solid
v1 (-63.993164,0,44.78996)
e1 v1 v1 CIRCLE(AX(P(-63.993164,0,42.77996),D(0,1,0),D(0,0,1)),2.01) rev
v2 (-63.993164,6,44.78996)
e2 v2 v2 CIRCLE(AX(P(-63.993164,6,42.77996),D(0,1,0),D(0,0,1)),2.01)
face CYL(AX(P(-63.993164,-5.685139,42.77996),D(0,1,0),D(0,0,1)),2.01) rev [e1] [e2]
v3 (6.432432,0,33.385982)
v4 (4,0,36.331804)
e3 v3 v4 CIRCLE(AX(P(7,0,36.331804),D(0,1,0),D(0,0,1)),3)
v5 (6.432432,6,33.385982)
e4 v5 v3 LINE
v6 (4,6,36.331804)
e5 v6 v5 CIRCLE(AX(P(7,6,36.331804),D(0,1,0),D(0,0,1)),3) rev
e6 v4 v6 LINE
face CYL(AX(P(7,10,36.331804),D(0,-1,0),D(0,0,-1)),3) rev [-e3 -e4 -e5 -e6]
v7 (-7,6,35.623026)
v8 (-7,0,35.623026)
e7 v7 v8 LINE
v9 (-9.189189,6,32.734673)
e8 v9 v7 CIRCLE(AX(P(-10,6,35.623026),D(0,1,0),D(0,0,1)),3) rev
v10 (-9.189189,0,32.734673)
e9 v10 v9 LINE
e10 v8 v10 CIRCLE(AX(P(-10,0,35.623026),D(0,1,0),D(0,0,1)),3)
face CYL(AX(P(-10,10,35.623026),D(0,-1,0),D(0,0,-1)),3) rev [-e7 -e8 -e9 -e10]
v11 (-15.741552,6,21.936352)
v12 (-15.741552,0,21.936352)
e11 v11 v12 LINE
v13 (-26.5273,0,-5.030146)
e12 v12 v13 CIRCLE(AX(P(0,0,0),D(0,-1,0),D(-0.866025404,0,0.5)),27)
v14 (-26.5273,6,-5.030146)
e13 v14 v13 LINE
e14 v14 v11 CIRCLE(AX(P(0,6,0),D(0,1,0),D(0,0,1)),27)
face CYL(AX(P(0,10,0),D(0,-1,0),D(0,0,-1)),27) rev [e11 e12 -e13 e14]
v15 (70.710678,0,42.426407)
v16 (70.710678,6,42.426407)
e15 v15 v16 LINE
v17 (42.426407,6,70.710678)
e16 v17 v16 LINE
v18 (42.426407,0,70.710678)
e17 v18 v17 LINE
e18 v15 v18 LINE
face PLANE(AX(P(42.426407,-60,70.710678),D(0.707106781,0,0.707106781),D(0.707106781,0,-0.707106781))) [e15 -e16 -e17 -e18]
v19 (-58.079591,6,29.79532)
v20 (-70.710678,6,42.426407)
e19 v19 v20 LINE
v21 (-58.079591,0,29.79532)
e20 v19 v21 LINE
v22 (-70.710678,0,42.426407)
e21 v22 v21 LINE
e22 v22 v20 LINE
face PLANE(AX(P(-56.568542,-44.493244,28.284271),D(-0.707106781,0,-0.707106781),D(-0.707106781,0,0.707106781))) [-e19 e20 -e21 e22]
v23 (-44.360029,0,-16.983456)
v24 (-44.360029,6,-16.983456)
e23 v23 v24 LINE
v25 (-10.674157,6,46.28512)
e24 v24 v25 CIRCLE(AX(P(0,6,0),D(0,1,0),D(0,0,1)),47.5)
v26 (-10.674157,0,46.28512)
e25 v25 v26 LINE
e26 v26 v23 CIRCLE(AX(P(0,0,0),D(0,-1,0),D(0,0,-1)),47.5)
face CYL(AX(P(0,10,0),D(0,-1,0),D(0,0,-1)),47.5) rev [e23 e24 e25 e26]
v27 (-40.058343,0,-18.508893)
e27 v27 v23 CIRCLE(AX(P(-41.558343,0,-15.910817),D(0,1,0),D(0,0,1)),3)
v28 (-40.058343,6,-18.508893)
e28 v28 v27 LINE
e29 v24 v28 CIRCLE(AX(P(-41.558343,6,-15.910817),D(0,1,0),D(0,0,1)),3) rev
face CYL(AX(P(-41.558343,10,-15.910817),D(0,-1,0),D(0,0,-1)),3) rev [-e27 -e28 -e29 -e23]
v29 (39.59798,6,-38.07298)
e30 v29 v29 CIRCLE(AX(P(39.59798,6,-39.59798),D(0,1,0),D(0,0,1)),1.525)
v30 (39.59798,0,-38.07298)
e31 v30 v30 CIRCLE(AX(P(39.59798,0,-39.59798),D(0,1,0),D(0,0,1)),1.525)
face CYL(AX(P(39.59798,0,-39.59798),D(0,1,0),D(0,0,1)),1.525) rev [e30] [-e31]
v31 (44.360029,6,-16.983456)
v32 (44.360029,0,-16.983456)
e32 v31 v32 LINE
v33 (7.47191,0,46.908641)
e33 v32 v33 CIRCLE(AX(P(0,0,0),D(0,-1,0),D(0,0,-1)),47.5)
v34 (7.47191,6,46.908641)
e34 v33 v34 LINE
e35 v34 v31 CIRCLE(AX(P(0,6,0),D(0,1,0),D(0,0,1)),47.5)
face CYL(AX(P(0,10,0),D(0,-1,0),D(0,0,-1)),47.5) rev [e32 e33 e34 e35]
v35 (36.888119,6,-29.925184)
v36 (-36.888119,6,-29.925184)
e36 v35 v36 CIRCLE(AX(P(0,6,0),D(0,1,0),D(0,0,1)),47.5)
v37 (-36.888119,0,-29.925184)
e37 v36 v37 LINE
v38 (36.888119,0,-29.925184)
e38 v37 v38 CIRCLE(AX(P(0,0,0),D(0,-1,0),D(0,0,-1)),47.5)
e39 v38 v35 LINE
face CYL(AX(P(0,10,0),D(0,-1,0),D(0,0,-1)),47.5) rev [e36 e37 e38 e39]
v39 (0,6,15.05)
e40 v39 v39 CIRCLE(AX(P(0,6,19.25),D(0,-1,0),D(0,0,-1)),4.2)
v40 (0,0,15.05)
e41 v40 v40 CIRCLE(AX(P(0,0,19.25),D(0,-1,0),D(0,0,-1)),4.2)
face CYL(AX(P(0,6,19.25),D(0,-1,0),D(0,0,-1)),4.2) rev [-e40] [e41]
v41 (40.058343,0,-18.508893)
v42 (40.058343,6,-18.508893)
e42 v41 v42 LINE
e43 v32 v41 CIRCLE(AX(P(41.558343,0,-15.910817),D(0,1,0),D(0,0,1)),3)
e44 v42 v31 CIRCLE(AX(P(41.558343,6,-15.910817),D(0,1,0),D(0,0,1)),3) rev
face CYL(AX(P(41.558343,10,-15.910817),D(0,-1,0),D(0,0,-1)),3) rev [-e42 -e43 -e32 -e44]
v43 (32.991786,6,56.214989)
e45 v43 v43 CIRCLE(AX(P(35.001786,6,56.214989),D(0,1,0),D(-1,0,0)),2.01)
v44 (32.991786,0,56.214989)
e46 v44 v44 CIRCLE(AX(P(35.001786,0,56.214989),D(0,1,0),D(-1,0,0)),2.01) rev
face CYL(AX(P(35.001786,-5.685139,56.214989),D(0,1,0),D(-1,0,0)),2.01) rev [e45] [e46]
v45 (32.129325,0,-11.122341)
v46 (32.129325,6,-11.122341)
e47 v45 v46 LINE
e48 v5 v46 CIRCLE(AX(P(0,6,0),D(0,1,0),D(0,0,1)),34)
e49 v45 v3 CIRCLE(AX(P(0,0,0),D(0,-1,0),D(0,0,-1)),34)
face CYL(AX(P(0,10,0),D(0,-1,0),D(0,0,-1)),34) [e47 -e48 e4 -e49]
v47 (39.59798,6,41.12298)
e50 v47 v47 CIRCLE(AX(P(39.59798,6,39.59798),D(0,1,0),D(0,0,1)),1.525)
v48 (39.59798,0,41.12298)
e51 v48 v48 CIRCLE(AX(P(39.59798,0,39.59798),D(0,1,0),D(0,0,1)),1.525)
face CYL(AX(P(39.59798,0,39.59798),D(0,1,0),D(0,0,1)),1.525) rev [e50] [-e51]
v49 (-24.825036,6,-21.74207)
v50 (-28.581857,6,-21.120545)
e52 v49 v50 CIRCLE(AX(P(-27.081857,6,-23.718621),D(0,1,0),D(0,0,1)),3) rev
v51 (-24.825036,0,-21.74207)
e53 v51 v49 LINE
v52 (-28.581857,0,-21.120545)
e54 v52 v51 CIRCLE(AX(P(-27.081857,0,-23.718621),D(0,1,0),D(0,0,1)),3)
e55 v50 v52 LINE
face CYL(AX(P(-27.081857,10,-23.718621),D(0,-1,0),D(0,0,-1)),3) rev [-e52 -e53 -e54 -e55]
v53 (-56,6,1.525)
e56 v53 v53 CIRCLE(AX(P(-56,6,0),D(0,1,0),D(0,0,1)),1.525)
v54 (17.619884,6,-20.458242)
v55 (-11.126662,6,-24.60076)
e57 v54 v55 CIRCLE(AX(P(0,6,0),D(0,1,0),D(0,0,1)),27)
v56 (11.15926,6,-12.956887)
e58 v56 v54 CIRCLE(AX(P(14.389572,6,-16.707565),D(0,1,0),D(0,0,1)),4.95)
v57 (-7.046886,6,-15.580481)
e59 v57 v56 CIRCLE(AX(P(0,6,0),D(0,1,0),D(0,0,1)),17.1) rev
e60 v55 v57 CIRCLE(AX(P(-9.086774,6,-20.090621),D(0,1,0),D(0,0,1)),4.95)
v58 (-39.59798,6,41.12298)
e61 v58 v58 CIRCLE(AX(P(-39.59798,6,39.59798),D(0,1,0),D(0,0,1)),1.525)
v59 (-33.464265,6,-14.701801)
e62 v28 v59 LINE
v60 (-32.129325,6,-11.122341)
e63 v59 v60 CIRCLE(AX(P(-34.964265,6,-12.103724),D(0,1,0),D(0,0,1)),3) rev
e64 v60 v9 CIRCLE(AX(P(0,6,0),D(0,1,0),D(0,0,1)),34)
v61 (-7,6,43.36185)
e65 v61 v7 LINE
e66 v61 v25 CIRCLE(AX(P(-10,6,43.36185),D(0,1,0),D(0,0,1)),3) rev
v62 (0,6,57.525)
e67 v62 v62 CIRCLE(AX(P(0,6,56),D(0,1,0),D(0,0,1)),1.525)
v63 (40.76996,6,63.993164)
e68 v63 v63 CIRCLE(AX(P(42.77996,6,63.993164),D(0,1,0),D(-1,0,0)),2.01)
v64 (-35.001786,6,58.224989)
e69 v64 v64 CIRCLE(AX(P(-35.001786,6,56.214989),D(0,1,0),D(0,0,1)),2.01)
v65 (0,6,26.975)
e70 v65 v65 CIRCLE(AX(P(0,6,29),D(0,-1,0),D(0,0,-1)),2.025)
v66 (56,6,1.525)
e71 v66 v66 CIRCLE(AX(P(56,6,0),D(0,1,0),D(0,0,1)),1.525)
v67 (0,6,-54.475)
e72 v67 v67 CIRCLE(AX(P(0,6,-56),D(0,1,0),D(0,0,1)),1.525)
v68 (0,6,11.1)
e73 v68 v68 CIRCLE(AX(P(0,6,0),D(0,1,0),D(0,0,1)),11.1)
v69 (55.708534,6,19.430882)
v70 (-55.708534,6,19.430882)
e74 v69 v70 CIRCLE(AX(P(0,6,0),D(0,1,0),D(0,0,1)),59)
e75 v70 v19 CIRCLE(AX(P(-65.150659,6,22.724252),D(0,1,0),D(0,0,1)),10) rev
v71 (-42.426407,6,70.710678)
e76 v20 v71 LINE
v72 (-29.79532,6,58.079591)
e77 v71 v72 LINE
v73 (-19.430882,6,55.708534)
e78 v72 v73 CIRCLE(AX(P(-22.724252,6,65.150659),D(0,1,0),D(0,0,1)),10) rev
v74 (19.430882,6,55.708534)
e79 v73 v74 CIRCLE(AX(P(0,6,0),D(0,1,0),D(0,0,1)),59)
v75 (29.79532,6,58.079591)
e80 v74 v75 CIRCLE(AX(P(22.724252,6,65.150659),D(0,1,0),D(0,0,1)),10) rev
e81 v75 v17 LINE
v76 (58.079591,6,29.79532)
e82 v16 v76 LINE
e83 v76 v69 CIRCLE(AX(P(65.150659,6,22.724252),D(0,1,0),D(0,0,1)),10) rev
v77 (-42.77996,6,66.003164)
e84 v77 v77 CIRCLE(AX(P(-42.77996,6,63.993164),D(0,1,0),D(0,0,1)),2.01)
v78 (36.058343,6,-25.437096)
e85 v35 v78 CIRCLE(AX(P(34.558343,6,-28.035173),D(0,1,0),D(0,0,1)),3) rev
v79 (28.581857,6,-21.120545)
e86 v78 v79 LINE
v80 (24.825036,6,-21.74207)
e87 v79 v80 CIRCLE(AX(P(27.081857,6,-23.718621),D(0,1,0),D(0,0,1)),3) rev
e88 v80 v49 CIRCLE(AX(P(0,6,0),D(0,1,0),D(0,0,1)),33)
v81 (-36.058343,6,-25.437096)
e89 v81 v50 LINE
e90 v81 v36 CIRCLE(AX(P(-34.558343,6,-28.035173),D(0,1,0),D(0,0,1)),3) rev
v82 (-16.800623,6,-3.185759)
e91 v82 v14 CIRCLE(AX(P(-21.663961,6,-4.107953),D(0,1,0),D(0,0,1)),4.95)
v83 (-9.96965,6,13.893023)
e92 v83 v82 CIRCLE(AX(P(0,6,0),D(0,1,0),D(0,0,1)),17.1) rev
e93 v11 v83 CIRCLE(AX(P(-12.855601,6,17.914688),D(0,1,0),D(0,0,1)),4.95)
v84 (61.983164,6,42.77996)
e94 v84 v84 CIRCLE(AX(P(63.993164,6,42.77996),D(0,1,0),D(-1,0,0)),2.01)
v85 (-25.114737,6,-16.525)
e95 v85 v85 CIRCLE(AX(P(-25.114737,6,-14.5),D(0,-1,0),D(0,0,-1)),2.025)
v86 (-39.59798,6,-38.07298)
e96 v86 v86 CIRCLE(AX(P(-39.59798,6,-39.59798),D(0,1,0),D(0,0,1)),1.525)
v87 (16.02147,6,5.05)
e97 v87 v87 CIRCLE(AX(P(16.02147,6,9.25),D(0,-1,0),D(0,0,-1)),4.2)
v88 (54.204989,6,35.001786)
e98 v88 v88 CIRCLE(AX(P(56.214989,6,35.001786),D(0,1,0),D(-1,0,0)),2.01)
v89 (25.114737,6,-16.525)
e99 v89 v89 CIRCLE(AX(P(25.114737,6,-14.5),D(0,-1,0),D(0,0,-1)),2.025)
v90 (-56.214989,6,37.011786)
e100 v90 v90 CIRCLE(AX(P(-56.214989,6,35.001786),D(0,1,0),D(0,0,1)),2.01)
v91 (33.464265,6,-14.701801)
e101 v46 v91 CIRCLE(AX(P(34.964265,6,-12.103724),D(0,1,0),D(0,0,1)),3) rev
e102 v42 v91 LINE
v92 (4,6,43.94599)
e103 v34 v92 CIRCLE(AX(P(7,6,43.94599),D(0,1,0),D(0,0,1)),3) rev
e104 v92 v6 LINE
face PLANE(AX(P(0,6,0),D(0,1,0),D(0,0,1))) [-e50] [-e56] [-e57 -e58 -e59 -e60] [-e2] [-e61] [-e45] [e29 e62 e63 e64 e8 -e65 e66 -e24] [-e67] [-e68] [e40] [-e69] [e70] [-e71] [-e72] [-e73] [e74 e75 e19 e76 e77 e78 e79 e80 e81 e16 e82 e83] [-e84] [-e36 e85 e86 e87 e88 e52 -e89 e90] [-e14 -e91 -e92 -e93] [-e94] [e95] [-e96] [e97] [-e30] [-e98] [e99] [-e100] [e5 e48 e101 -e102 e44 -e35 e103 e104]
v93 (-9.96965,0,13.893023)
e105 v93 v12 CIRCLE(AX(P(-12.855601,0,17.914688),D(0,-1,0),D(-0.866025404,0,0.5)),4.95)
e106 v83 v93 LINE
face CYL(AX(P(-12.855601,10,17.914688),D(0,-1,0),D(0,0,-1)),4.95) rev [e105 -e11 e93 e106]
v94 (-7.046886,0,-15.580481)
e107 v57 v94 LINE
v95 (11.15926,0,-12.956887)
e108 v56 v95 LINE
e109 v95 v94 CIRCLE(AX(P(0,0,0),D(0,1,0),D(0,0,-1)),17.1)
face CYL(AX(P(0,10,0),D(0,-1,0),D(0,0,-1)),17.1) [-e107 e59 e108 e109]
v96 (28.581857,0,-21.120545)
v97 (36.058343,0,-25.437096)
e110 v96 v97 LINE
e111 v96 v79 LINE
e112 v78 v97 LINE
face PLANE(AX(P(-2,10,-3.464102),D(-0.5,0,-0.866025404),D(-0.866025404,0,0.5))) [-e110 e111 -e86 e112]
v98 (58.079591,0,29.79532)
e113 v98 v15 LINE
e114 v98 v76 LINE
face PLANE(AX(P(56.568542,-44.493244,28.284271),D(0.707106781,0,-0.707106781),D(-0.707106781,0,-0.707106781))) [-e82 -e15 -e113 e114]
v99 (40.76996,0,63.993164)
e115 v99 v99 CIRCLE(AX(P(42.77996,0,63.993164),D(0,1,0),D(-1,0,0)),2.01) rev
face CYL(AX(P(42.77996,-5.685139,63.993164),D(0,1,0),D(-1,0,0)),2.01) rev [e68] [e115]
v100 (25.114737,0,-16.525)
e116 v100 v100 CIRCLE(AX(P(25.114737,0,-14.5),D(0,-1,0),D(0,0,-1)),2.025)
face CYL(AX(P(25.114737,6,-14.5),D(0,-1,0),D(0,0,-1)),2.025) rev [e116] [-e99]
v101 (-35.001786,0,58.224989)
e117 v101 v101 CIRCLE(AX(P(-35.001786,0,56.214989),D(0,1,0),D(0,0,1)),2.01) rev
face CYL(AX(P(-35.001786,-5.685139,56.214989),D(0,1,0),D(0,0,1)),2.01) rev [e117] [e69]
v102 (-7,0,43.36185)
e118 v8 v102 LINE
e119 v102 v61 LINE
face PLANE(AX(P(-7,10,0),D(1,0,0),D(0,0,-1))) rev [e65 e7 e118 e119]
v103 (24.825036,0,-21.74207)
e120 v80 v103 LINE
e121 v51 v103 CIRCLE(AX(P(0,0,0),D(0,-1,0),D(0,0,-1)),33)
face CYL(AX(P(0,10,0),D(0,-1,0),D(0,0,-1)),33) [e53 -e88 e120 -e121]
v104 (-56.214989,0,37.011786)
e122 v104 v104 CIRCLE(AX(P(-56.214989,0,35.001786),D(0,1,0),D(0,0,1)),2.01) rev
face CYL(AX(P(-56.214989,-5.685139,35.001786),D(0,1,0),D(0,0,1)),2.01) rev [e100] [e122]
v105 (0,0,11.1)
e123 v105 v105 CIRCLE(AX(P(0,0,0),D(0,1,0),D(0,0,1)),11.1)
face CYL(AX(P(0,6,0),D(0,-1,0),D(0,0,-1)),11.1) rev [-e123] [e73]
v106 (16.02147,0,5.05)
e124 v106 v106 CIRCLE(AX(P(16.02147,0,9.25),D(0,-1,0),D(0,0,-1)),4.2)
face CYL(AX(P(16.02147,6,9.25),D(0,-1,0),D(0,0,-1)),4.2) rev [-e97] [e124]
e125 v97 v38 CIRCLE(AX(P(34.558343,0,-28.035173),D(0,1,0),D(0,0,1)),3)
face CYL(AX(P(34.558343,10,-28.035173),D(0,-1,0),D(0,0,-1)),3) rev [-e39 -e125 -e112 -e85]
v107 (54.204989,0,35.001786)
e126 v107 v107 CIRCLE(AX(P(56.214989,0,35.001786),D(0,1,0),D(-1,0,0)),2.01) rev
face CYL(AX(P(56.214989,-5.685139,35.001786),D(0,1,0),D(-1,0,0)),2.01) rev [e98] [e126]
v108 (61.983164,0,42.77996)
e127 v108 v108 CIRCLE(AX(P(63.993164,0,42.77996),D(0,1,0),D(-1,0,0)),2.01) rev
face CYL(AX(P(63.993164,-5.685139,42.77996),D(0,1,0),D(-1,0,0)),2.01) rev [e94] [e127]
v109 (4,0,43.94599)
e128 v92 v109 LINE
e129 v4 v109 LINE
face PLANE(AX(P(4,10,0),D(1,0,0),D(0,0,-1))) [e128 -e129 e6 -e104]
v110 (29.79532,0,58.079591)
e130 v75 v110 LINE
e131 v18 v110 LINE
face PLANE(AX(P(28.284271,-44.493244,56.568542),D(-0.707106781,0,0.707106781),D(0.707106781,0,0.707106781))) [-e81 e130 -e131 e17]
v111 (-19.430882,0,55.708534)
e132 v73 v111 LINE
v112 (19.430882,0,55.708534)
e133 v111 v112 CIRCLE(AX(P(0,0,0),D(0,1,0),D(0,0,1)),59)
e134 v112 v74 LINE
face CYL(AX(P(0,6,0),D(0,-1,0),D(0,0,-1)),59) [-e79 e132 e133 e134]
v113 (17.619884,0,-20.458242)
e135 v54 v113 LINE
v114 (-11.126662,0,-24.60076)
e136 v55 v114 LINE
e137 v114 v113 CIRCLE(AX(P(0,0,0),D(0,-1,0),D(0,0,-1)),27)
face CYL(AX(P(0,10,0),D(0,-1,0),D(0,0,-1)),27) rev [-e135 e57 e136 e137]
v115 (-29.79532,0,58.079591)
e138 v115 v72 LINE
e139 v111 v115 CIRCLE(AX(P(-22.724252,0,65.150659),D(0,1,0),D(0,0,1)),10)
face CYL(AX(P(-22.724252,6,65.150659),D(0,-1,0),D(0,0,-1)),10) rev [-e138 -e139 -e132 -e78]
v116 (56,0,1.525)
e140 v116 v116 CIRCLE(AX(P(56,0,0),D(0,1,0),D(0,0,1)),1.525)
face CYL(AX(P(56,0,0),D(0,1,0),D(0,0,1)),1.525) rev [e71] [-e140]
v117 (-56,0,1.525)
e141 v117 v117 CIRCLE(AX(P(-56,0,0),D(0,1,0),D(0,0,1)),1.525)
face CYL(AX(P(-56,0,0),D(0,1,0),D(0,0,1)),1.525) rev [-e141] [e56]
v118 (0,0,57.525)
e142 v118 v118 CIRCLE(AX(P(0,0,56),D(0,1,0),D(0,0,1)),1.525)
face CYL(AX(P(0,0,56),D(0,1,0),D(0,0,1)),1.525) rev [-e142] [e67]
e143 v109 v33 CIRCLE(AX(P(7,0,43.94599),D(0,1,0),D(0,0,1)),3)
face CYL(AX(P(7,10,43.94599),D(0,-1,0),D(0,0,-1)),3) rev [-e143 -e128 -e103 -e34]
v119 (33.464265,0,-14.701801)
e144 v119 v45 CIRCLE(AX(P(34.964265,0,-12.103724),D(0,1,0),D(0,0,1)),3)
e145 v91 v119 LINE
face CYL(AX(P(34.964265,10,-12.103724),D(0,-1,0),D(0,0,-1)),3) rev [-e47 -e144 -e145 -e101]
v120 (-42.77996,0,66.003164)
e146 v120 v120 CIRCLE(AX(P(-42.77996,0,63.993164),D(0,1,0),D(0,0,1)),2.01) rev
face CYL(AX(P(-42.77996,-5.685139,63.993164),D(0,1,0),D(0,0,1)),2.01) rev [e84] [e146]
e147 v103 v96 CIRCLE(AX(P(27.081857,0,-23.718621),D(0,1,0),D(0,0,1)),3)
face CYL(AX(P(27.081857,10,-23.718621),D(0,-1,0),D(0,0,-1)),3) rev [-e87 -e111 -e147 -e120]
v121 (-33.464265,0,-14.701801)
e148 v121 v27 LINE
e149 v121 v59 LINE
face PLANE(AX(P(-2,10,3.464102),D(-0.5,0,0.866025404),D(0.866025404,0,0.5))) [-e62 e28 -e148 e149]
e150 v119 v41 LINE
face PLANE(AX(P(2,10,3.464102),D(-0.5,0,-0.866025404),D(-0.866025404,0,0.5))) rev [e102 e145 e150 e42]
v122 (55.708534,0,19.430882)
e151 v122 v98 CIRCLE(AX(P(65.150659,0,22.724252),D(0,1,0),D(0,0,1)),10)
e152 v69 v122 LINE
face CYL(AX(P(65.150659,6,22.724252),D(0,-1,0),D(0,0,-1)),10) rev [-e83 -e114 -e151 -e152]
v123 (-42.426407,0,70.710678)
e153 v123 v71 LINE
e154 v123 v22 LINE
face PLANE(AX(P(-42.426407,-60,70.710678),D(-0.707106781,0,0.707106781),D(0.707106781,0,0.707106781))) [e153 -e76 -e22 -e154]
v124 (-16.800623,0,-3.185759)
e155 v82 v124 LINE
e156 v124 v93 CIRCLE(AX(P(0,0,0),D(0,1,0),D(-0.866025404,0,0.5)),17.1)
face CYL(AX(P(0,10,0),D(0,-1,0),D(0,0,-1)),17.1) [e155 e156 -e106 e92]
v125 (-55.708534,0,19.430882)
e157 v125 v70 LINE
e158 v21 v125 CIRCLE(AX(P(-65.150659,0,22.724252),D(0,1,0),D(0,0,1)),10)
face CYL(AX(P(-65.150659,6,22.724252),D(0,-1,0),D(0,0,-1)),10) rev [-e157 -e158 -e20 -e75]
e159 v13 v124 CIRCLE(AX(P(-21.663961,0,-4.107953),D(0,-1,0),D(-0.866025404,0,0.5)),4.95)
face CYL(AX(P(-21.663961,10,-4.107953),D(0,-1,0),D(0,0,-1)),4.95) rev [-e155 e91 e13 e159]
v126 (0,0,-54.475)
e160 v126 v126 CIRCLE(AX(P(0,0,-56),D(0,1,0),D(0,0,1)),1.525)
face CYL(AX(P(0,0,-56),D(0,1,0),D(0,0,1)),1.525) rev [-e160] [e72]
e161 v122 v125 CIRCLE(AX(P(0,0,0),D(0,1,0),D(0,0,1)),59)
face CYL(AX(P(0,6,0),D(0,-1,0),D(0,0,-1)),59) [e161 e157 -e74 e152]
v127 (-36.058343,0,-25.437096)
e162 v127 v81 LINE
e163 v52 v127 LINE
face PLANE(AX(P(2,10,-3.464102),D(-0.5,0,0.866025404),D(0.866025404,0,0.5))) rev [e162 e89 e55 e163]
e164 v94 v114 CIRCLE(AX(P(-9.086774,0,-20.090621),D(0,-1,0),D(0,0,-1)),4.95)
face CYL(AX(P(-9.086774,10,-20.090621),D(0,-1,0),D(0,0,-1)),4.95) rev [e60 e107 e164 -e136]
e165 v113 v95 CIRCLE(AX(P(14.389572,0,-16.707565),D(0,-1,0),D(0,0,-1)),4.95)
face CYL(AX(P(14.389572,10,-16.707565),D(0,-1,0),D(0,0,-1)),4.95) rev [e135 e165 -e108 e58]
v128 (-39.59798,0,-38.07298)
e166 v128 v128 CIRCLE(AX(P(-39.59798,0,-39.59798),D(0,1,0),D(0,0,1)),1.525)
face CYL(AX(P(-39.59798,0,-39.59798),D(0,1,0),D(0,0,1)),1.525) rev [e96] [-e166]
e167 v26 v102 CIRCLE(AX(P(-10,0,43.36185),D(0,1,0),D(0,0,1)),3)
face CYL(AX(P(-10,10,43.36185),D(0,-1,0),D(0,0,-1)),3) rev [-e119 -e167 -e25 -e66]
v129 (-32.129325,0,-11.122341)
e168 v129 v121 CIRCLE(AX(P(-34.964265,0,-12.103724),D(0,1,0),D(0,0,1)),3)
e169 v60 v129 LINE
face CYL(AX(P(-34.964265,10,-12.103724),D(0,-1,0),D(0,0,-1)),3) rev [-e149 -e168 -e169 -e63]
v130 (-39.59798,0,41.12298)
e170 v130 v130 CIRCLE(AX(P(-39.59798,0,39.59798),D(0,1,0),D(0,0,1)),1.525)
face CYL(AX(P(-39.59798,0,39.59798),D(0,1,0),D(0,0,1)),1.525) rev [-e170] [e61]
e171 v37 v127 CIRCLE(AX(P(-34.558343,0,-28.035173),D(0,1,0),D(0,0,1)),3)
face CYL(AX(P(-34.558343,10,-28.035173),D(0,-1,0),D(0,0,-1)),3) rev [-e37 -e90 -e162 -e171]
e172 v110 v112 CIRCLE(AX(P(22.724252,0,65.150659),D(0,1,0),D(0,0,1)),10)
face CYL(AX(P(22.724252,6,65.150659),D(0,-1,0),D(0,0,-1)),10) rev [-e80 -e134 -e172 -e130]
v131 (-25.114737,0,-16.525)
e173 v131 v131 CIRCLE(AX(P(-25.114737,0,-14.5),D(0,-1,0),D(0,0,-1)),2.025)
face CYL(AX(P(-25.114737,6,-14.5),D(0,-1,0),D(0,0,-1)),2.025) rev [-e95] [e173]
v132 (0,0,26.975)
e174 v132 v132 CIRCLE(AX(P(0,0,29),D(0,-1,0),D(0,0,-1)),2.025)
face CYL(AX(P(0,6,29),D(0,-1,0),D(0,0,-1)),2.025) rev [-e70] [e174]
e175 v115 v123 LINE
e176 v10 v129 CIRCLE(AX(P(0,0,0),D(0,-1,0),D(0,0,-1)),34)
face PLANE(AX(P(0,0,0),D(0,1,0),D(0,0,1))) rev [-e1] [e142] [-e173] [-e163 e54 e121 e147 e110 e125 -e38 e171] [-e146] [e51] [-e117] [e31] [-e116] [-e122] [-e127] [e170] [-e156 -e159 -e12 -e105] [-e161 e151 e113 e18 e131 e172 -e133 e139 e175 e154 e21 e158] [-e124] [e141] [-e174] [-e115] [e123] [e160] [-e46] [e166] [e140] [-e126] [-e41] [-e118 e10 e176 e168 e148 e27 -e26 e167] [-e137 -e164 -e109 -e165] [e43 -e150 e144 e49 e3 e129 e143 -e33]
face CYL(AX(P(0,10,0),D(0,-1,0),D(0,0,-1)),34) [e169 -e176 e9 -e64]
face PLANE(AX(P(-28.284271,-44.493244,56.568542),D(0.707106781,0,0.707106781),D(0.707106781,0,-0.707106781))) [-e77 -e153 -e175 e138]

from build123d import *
from build123d.topology import SkipClean

# Parameters (mm, degrees)
SKETCH_1_R               = 59
SKETCH_1_R_2             = 11.1
EXTRUDE_1_DEPTH          = 6
SKETCH_2_R               = 1.525
CUT_EXTRUDE_1_DEPTH      = 6
EXTRUDE_START            = -6
EXTRUDE_2_DEPTH          = 6
SKETCH_4_R               = 4.2
SKETCH_4_R_2             = 2.025
CUT_EXTRUDE_2_DEPTH      = 6
SKETCH_5_R               = 4.2
CUT_EXTRUDE_3_DEPTH      = 6
CUT_EXTRUDE_4_DEPTH      = 10
CUT_EXTRUDE_5_DEPTH      = 10
CUT_EXTRUDE_7_DEPTH      = 10
FILLET_1_R               = 3
SKETCH_11_R              = 2.5
CUT_EXTRUDE_8_DEPTH      = 10
CUT_EXTRUDE_9_DEPTH      = 10
PATTERN_CIRCULAR_1_COUNT = 3
CUT_EXTRUDE_10_DEPTH     = 20
FILLET_3_R               = 20
FILLET_4_R               = 2
EXTRUDE_3_DEPTH          = 6
SKETCH_17_R              = 2.5
CUT_EXTRUDE_11_DEPTH     = 6
FILLET_5_R               = 20
EXTRUDE_4_DEPTH          = 6
MOVE_START               = -1
MOVE_FACE_1_OUTLINE_R    = 2.5
MOVE_FACE_1_DEPTH        = 8
MOVE_FACE_1_2_OUTLINE_R  = 2.5
MOVE_FACE_1_2_DEPTH      = 6
MOVE_FACE_2_OUTLINE_R    = 2.5
MOVE_FACE_2_DEPTH        = 8
MOVE_FACE_2_2_OUTLINE_R  = 2.5
MOVE_FACE_2_2_DEPTH      = 6
CUT_EXTRUDE_12_DEPTH     = 6
SKETCH_22_W              = 27
SKETCH_22_H              = 27
CUT_EXTRUDE_13_DEPTH     = 6
CHAMFER_1_SIZE           = 10
CHAMFER_1_SIZE_2         = 8.996196186
CHAMFER_2_SIZE           = 10
CHAMFER_3_SIZE           = 5
FILLET_6_R               = 5
FILLET_7_R               = 5
SKETCH_23_W              = 40
SKETCH_23_H              = 20
SKETCH_23_R              = 2.01
EXTRUDE_5_DEPTH          = 6
CUT_EXTRUDE_14_DEPTH     = 10
EXTRUDE_6_DEPTH          = 6
CUT_EXTRUDE_15_DEPTH     = 10
EXTRUDE_7_DEPTH          = 6
EXTRUDE_7_2_DEPTH        = 6
SKETCH_30_R              = 2.01
CUT_EXTRUDE_16_DEPTH     = 6
MOVE_BODY_2_ANGLE        = 90
EXTRUDE_9_DEPTH          = 6
FILLET_8_R               = 10


with BuildPart() as part:
    # 草图1 → 凸台-拉伸1 (new body)
    with BuildSketch(Plane(origin=(0, 0, 0), x_dir=(1, 0, 0), z_dir=(0, 1, 0))):
        with Locations(Location((0, 0, 0), (0, 0, 270))):
            Circle(SKETCH_1_R)
        with Locations(Location((0, 0, 0), (0, 0, 270))):
            Circle(SKETCH_1_R_2, mode=Mode.SUBTRACT)
    extrude(amount=EXTRUDE_1_DEPTH)

    # 草图2 → 切除-拉伸1 (cut)
    with BuildSketch(Plane(origin=(0, 6, 0), x_dir=(1, 0, 0), z_dir=(0, 1, 0))):
        with Locations(Location((0, 56, 0), (0, 0, 270))):
            Circle(SKETCH_2_R)
        with Locations(Location((39.597979746, 39.597979746, 0), (0, 0, 270))):
            Circle(SKETCH_2_R)
        with Locations(Location((56, 0, 0), (0, 0, 270))):
            Circle(SKETCH_2_R)
        with Locations(Location((39.597979746, -39.597979746, 0), (0, 0, 270))):
            Circle(SKETCH_2_R)
        with Locations(Location((0, -56, 0), (0, 0, 270))):
            Circle(SKETCH_2_R)
        with Locations(Location((-39.597979746, -39.597979746, 0), (0, 0, 270))):
            Circle(SKETCH_2_R)
        with Locations(Location((-56, 0, 0), (0, 0, 270))):
            Circle(SKETCH_2_R)
        with Locations(Location((-39.597979746, 39.597979746, 0), (0, 0, 270))):
            Circle(SKETCH_2_R)
    extrude(amount=-CUT_EXTRUDE_1_DEPTH, mode=Mode.SUBTRACT)

    # 草图3 → 凸台-拉伸2 (add)
    with BuildSketch(Plane(origin=(0, 6, 0), x_dir=(1, 0, 0), z_dir=(0, 1, 0)).offset(EXTRUDE_START)):
        with BuildLine():
            Line((-51.088050573, 29.512896989), (-22.5, 79))
            Line((-22.5, 79), (22.5, 79))
            Line((22.5, 79), (51.088050573, 29.512896989))
            ThreePointArc((51.088050573, 29.512896989), (0, 59), (-51.088050573, 29.512896989))
        make_face()
    extrude(amount=EXTRUDE_2_DEPTH)

    # 草图4 → 切除-拉伸2 (cut)
    with BuildSketch(Plane.XZ):
        with Locations(Location((0, 19.25, 0), (0, 0, 270))):
            Circle(SKETCH_4_R)
        with Locations(Location((0, 29, 0), (0, 0, 270))):
            Circle(SKETCH_4_R_2)
        with Locations(Location((25.11473671, -14.5, 0), (0, 0, 270))):
            Circle(SKETCH_4_R_2)
        with Locations(Location((-25.11473671, -14.5, 0), (0, 0, 270))):
            Circle(SKETCH_4_R_2)
    extrude(amount=-CUT_EXTRUDE_2_DEPTH, mode=Mode.SUBTRACT)

    # 草图5 → 切除-拉伸3 (cut)
    with BuildSketch(Plane.XZ):
        with Locations(Location((16.02146997, 9.25, 0), (0, 0, 270))):
            Circle(SKETCH_5_R)
    extrude(amount=-CUT_EXTRUDE_3_DEPTH, mode=Mode.SUBTRACT)

    # 草图8 → 切除-拉伸4 (cut)
    with BuildSketch(Plane.XZ):
        with BuildLine():
            Line((38.990090266, -27.129741264), (26.368115905, -19.842440969))
            ThreePointArc((26.368115905, -19.842440969), (0, -33), (-26.368115905, -19.842440969))
            Line((-26.368115905, -19.842440969), (-38.990090266, -27.129741264))
            ThreePointArc((-38.990090266, -27.129741264), (0, -47.5), (38.990090266, -27.129741264))
        make_face()
    extrude(amount=-CUT_EXTRUDE_4_DEPTH, mode=Mode.SUBTRACT)

    # 草图9 → 切除-拉伸5 (cut)
    with BuildSketch(Plane.XZ):
        with BuildLine():
            ThreePointArc((34, 0), (33.302950494, -6.849342188), (31.240383034, -13.417841401))
            Line((31.240383034, -13.417841401), (42.990090266, -20.201538034))
            ThreePointArc((42.990090266, -20.201538034), (46.35881409, -10.349413326), (47.5, 0))
            ThreePointArc((47.5, 0), (34.973204028, 32.142261899), (4, 47.331279298))
            Line((4, 47.331279298), (4, 33.763886032))
            ThreePointArc((4, 33.763886032), (25.416530054, 22.583179581), (34, 0))
        make_face()
    extrude(amount=-CUT_EXTRUDE_5_DEPTH, mode=Mode.SUBTRACT)

    # 草图10 → 切除-拉伸7 (cut)
    with BuildSketch(Plane.XZ):
        with BuildLine():
            Line((-42.990090266, -20.201538034), (-31.240383034, -13.417841401))
            ThreePointArc((-31.240383034, -13.417841401), (-30.175452448, 15.666590872), (-7, 33.271609519))
            Line((-7, 33.271609519), (-7, 46.98137929))
            ThreePointArc((-7, 46.98137929), (-41.870495295, 22.430149883), (-42.990090266, -20.201538034))
        make_face()
    extrude(amount=-CUT_EXTRUDE_7_DEPTH, mode=Mode.SUBTRACT)

    # 圆角1
    fillet_1_edges = [part.edges().sort_by_distance(p)[0] for p in [
        (42.990090266, 3, -20.201538034),
        (31.240383034, 3, -13.417841401),
        (4, 3, 33.763886032),
        (4, 3, 47.331279298),
        (-7, 3, 46.98137929),
        (-7, 3, 33.271609519),
        (-31.240383034, 3, -13.417841401),
        (-42.990090266, 3, -20.201538034),
        (-26.368115905, 3, -19.842440969),
        (26.368115905, 3, -19.842440969),
        (38.990090266, 3, -27.129741264),
        (-38.990090266, 3, -27.129741264),
    ]]
    fillet(fillet_1_edges, radius=FILLET_1_R)

    # 草图11 → 切除-拉伸8 (cut)
    with BuildSketch(Plane(origin=(0, 6, 0), x_dir=(1, 0, 0), z_dir=(0, 1, 0))):
        with Locations(Location((15, 63, 0), (0, 0, 270))):
            Circle(SKETCH_11_R)
        with Locations(Location((15, 74, 0), (0, 0, 270))):
            Circle(SKETCH_11_R)
        with Locations(Location((-15, 63, 0), (0, 0, 270))):
            Circle(SKETCH_11_R)
        with Locations(Location((-15, 74, 0), (0, 0, 270))):
            Circle(SKETCH_11_R)
    extrude(amount=-CUT_EXTRUDE_8_DEPTH, mode=Mode.SUBTRACT)

    # 草图12 → 切除-拉伸9 (cut)
    with BuildSketch(Plane.XZ):
        with BuildLine():
            ThreePointArc((-11.126662137, -24.600759941), (3.851051224, -26.723948145), (17.619884076, -20.458242475))
            ThreePointArc((17.619884076, -20.458242475), (18.140249782, -13.477252607), (11.159259915, -12.956886901))
            ThreePointArc((11.159259915, -12.956886901), (2.438999108, -16.925167159), (-7.04688602, -15.580481296))
            ThreePointArc((-7.04688602, -15.580481296), (-13.596913401, -18.05073256), (-11.126662137, -24.600759941))
        make_face()
    cut_extrude_9 = extrude(amount=-CUT_EXTRUDE_9_DEPTH, mode=Mode.SUBTRACT)

    # 阵列(圆周)1: 切除-拉伸9 ×3 about axis, 1 skipped
    pattern_circular_1_axis = Axis((0, 0, 0), (0, 1, 0))
    add([cut_extrude_9.rotate(pattern_circular_1_axis, i * 360 / PATTERN_CIRCULAR_1_COUNT) for i in range(1, PATTERN_CIRCULAR_1_COUNT) if i not in (2,)], mode=Mode.SUBTRACT)

    # 草图15 → 切除-拉伸10 (cut, symmetric)
    with BuildSketch(Plane.XZ):
        with BuildLine():
            Line((22.5, -79), (22.5, -69))
            Line((22.5, -69), (47.535137175, -34.948687153))
            ThreePointArc((47.535137175, -34.948687153), (49.386437856, -32.279711212), (51.088050573, -29.512896989))
            Line((51.088050573, -29.512896989), (22.5, -79))
        make_face()
        with BuildLine():
            Line((-22.5, -79), (-51.088050573, -29.512896989))
            ThreePointArc((-51.088050573, -29.512896989), (-49.386437856, -32.279711212), (-47.535137175, -34.948687153))
            Line((-47.535137175, -34.948687153), (-22.5, -69))
            Line((-22.5, -69), (-22.5, -79))
        make_face()
    extrude(amount=CUT_EXTRUDE_10_DEPTH, both=True, mode=Mode.SUBTRACT)

    # 圆角3
    fillet_3_edges = [part.edges().sort_by_distance(p)[0] for p in [
        (-22.5, 3, -69),
        (22.5, 3, -69),
    ]]
    fillet(fillet_3_edges, radius=FILLET_3_R)

    # 圆角4
    fillet_4_edges = [part.edges().sort_by_distance(p)[0] for p in [
        (-22.5, 3, -79),
        (22.5, 3, -79),
    ]]
    fillet(fillet_4_edges, radius=FILLET_4_R)

    # 草图16 → 凸台-拉伸3 (add)
    with BuildSketch(Plane.XZ):
        with BuildLine():
            ThreePointArc((-77, 22.5), (-78.414213562, 21.914213562), (-79, 20.5))
            Line((-79, 20.5), (-79, -20.5))
            ThreePointArc((-79, -20.5), (-78.414213562, -21.914213562), (-77, -22.5))
            Line((-77, -22.5), (-75.5609691, -22.5))
            ThreePointArc((-75.5609691, -22.5), (-69.326873995, -23.496419858), (-63.713956506, -26.386394178))
            Line((-63.713956506, -26.386394178), (-42.202213929, -42.202213929))
            Line((-42.202213929, -42.202213929), (-47.535137175, -34.948687153))
            ThreePointArc((-47.535137175, -34.948687153), (-58.324871521, 8.899964162), (-34.948687153, 47.535137175))
            Line((-34.948687153, 47.535137175), (-63.713956506, 26.386394178))
            ThreePointArc((-63.713956506, 26.386394178), (-69.326873995, 23.496419858), (-75.5609691, 22.5))
            Line((-75.5609691, 22.5), (-77, 22.5))
        make_face()
    extrude(amount=-EXTRUDE_3_DEPTH)

    # 草图17 → 切除-拉伸11 (cut)
    with BuildSketch(Plane.XZ):
        with Locations(Location((-74, -15, 0), (0, 0, 270))):
            Circle(SKETCH_17_R)
        with Locations(Location((-63, -15, 0), (0, 0, 270))):
            Circle(SKETCH_17_R)
        with Locations(Location((-74, 15, 0), (0, 0, 270))):
            Circle(SKETCH_17_R)
        with Locations(Location((-63, 15, 0), (0, 0, 270))):
            Circle(SKETCH_17_R)
    extrude(amount=-CUT_EXTRUDE_11_DEPTH, mode=Mode.SUBTRACT)

    # 圆角5
    fillet_5_edges = [part.edges().sort_by_distance(p)[0] for p in [
        (-42.202213929, 3, -42.202213929),
    ]]
    fillet(fillet_5_edges, radius=FILLET_5_R)

    # 草图20 → 凸台-拉伸4 (add)
    with BuildSketch(Plane.XZ.offset(EXTRUDE_START)):
        with BuildLine():
            ThreePointArc((-22.5, -77), (-21.914213562, -78.414213562), (-20.5, -79))
            Line((-20.5, -79), (-79, -79))
            Line((-79, -79), (-79, -20.5))
            ThreePointArc((-79, -20.5), (-78.414213562, -21.914213562), (-77, -22.5))
            Line((-77, -22.5), (-75.5609691, -22.5))
            ThreePointArc((-75.5609691, -22.5), (-69.326873995, -23.496419858), (-63.713956506, -26.386394178))
            Line((-63.713956506, -26.386394178), (-44.661036565, -40.394443337))
            ThreePointArc((-44.661036565, -40.394443337), (-42.365913536, -42.365913536), (-40.394443337, -44.661036565))
            Line((-40.394443337, -44.661036565), (-26.386394178, -63.713956506))
            ThreePointArc((-26.386394178, -63.713956506), (-23.496419858, -69.326873995), (-22.5, -75.5609691))
            Line((-22.5, -75.5609691), (-22.5, -77))
        make_face()
    extrude(amount=EXTRUDE_4_DEPTH)

    # Move Face 1: read off the stored shape, not the designer's step
    # Move Face 1 outline → Move Face 1 (cut)
    with BuildSketch(Plane(origin=(0, 0, 0), x_dir=(1, 0, 0), z_dir=(0, 1, 0)).offset(MOVE_START)):
        with Locations((-45, 74)):
            Circle(MOVE_FACE_1_OUTLINE_R)
        with Locations((-45, 63)):
            Circle(MOVE_FACE_1_OUTLINE_R)
    extrude(amount=MOVE_FACE_1_DEPTH, mode=Mode.SUBTRACT)

    # Move Face 1 2 outline → Move Face 1 2 (add)
    with BuildSketch(Plane(origin=(0, 0, 0), x_dir=(1, 0, 0), z_dir=(0, 1, 0))):
        with Locations((15, 63)):
            Circle(MOVE_FACE_1_2_OUTLINE_R)
        with Locations((15, 74)):
            Circle(MOVE_FACE_1_2_OUTLINE_R)
    extrude(amount=MOVE_FACE_1_2_DEPTH)

    # Move Face 2: read off the stored shape, not the designer's step
    # Move Face 2 outline → Move Face 2 (cut)
    with BuildSketch(Plane(origin=(0, 0, 0), x_dir=(1, 0, 0), z_dir=(0, 1, 0)).offset(MOVE_START)):
        with Locations((-63, 45)):
            Circle(MOVE_FACE_2_OUTLINE_R)
        with Locations((-74, 45)):
            Circle(MOVE_FACE_2_OUTLINE_R)
    extrude(amount=MOVE_FACE_2_DEPTH, mode=Mode.SUBTRACT)

    # Move Face 2 2 outline → Move Face 2 2 (add)
    with BuildSketch(Plane(origin=(0, 0, 0), x_dir=(1, 0, 0), z_dir=(0, 1, 0))):
        with Locations((-74, -15)):
            Circle(MOVE_FACE_2_2_OUTLINE_R)
        with Locations((-63, -15)):
            Circle(MOVE_FACE_2_2_OUTLINE_R)
    extrude(amount=MOVE_FACE_2_2_DEPTH)

    # 草图21 → 切除-拉伸12 (cut)
    with SkipClean():  # the faces are left unmerged after this step: merging them gives an invalid solid
        with BuildSketch(Plane.XZ):
            with BuildLine():
                Line((-79, 20.5), (-79, -7))
                Line((-79, -7), (-58.583274064, -7))
                ThreePointArc((-58.583274064, -7), (-54.134806169, 23.461090364), (-34.948687153, 47.535137175))
                Line((-34.948687153, 47.535137175), (-63.713956506, 26.386394178))
                ThreePointArc((-63.713956506, 26.386394178), (-69.326873995, 23.496419858), (-75.5609691, 22.5))
                Line((-75.5609691, 22.5), (-77, 22.5))
                ThreePointArc((-77, 22.5), (-78.414213562, 21.914213562), (-79, 20.5))
            make_face()
            with BuildLine():
                ThreePointArc((47.535137175, -34.948687153), (23.461090364, -54.134806169), (-7, -58.583274064))
                Line((-7, -58.583274064), (-7, -79))
                Line((-7, -79), (20.5, -79))
                ThreePointArc((20.5, -79), (21.914213562, -78.414213562), (22.5, -77))
                Line((22.5, -77), (22.5, -75.5609691))
                ThreePointArc((22.5, -75.5609691), (23.496419858, -69.326873995), (26.386394178, -63.713956506))
                Line((26.386394178, -63.713956506), (47.535137175, -34.948687153))
            make_face()
        extrude(amount=-CUT_EXTRUDE_12_DEPTH, mode=Mode.SUBTRACT)

    # 草图22 → 切除-拉伸13 (cut)
    with SkipClean():  # the faces are left unmerged after this step: merging them gives an invalid solid
        with BuildSketch(Plane.XZ):
            with Locations((-65.5, -65.5)):
                Rectangle(SKETCH_22_W, SKETCH_22_H)
        extrude(amount=-CUT_EXTRUDE_13_DEPTH, mode=Mode.SUBTRACT)

    # 倒角1
    # the kernel refuses this chamfer: 10, 8.996196186 mm, written as the material it adds along each edge
    with BuildSketch(Plane(origin=(-58.583274064, 0, -7), x_dir=(-0.03705222854815776, 0, 0.9993133304222529), z_dir=(0, 1, 0))) as chamfer_1_piece_1:
        with BuildLine():
            Line((9.649104907, 0), (CHAMFER_1_SIZE * 0.0370522285482, -CHAMFER_1_SIZE * 0.999313330422))
            Line((CHAMFER_1_SIZE * 0.0370522285482, -CHAMFER_1_SIZE * 0.999313330422), (0, 0))
            ThreePointArc((0, 0), (4.961434803, -0.197428902), (9.649104907, 0))
        make_face()
    extrude(amount=6)
    with BuildSketch(Plane(origin=(-7, 0, -58.583274064), x_dir=(0, 0, -1), z_dir=(0, 1, 0))) as chamfer_1_piece_2:
        with BuildLine():
            Line((CHAMFER_1_SIZE_2, 0), (0.274910204, -11.088293621))
            ThreePointArc((0.274910204, -11.088293621), (0.402241702, -5.692739545), (0, 0))
            Line((0, 0), (CHAMFER_1_SIZE_2, 0))
        make_face()
    extrude(amount=6)

    # 倒角2
    chamfer_2_edges = [part.edges().sort_by_distance(p)[0] for p in [
        (-52, 3, -52),
    ]]
    chamfer(chamfer_2_edges, length=CHAMFER_2_SIZE)

    # 倒角3
    chamfer_3_edges = [part.edges().sort_by_distance(p)[0] for p in [
        (-79, 3, -7),
        (-7, 3, -79),
        (-52, 3, -79),
        (-79, 3, -52),
    ]]
    chamfer(chamfer_3_edges, length=CHAMFER_3_SIZE)

    # 圆角6
    fillet_6_edges = [part.edges().sort_by_distance(p)[0] for p in [
        (-62, 3, -52),
        (-52, 3, -62),
    ]]
    fillet(fillet_6_edges, radius=FILLET_6_R)

    # 圆角7
    fillet_7_edges = [part.edges().sort_by_distance(p)[0] for p in [
        (-7, 3, -67.57947025),
        (-58.940794904, 3, 2.64247916),
        (4.088293621, 3, -58.858184268),
        (-68.583274064, 3, -7),
    ]]
    fillet(fillet_7_edges, radius=FILLET_7_R)

    # 草图23 → 凸台-拉伸5 (add)
    # profile 1 of 2: a face of its own
    with BuildSketch(Plane(origin=(0, 6, 0), x_dir=(1, 0, 0), z_dir=(0, 1, 0)).offset(EXTRUDE_START)):
        with BuildLine():
            Line((57, 59), (25, 59))
            Line((25, 59), (4.342510776, 59))
            ThreePointArc((4.342510776, 59), (4.927450513, 58.834106383), (5.528201143, 58.740437453))
            ThreePointArc((5.528201143, 58.740437453), (38.088054411, 45.058851641), (57, 15.231546212))
            Line((57, 15.231546212), (57, 59))
        make_face()
    # profile 2 of 2: a face of its own
    with BuildSketch(Plane(origin=(0, 6, 0), x_dir=(1, 0, 0), z_dir=(0, 1, 0)).offset(EXTRUDE_START)):
        with Locations((45, 69)):
            Rectangle(SKETCH_23_W, SKETCH_23_H)
        with Locations(Location((60, 64, 0), (0, 0, 270))):
            Circle(SKETCH_23_R, mode=Mode.SUBTRACT)
        with Locations(Location((30, 64, 0), (0, 0, 270))):
            Circle(SKETCH_23_R, mode=Mode.SUBTRACT)
        with Locations(Location((30, 75, 0), (0, 0, 270))):
            Circle(SKETCH_23_R, mode=Mode.SUBTRACT)
        with Locations(Location((60, 75, 0), (0, 0, 270))):
            Circle(SKETCH_23_R, mode=Mode.SUBTRACT)
    extrude_5 = extrude(amount=EXTRUDE_5_DEPTH)

    # 镜向1: 凸台-拉伸5 across plane
    add(extrude_5.mirror(Plane(origin=(0, 0, 0), x_dir=(0.7071067811865478, 0, 0.7071067811865472), z_dir=(-0.7071067811865475, 0, 0.7071067811865477))))

    # 草图25 → 切除-拉伸14 (cut)
    with BuildSketch(Plane(origin=(0, 6, 0), x_dir=(1, 0, 0), z_dir=(0, 1, 0))):
        with BuildLine():
            Line((0, 59), (4.342510776, 59))
            ThreePointArc((4.342510776, 59), (3.591531067, 59.334926374), (2.905600995, 59.788408608))
            Line((2.905600995, 59.788408608), (-5.09109177, 66.078054869))
            ThreePointArc((-5.09109177, 66.078054869), (-6.497524811, 67.82353417), (-7, 70.008086888))
            Line((-7, 70.008086888), (-7, 74))
            Line((-7, 74), (-12, 79))
            Line((-12, 79), (-47, 79))
            Line((-47, 79), (-52, 74))
            Line((-52, 74), (-52, 64.071067812))
            ThreePointArc((-52, 64.071067812), (-52.380602337, 62.15765065), (-53.464466094, 60.535533906))
            Line((-53.464466094, 60.535533906), (-60.535533906, 53.464466094))
            ThreePointArc((-60.535533906, 53.464466094), (-62.15765065, 52.380602337), (-64.071067812, 52))
            Line((-64.071067812, 52), (-74, 52))
            Line((-74, 52), (-79, 47))
            Line((-79, 47), (-79, 12))
            Line((-79, 12), (-74, 7))
            Line((-74, 7), (-70.654341875, 7))
            ThreePointArc((-70.654341875, 7), (-68.740924714, 6.619397663), (-67.118807969, 5.535533906))
            Line((-67.118807969, 5.535533906), (-60.281386699, -1.301887365))
            ThreePointArc((-60.281386699, -1.301887365), (-59.273192013, -2.750670092), (-58.831223682, -4.459497734))
            ThreePointArc((-58.831223682, -4.459497734), (-43.267253011, 40.111654377), (0, 59))
        make_face()
    extrude(amount=-CUT_EXTRUDE_14_DEPTH, mode=Mode.SUBTRACT)

    # 草图26 → 凸台-拉伸6 (add)
    with BuildSketch(Plane(origin=(0, 6, 0), x_dir=(1, 0, 0), z_dir=(0, 1, 0)).offset(EXTRUDE_START)):
        with BuildLine():
            Line((-59, 0), (-59, -4.342510776))
            ThreePointArc((-59, -4.342510776), (-58.834106383, -4.927450513), (-58.740437453, -5.528201143))
            ThreePointArc((-58.740437453, -5.528201143), (-58.935073639, -2.767145668), (-59, 0))
        make_face()
    extrude(amount=EXTRUDE_6_DEPTH)

    # 草图27 → 切除-拉伸15 (cut)
    with BuildSketch(Plane(origin=(0, 6, 0), x_dir=(1, 0, 0), z_dir=(0, 1, 0))):
        with BuildLine():
            Line((-59, 0), (-59, -25))
            Line((-59, -25), (-59, -57))
            Line((-59, -57), (-15.231546212, -57))
            ThreePointArc((-15.231546212, -57), (-46.795626005, -35.932845514), (-59, 0))
        make_face()
        with BuildLine():
            Line((25, 59), (0, 59))
            ThreePointArc((0, 59), (35.932845514, 46.795626005), (57, 15.231546212))
            Line((57, 15.231546212), (57, 59))
            Line((57, 59), (25, 59))
        make_face()
    extrude(amount=-CUT_EXTRUDE_15_DEPTH, mode=Mode.SUBTRACT)


with BuildPart() as cut_extrude_15_kept_piece:
    # of the separate pieces the step leaves, the one the design keeps (cut_extrude_15_pieces_kept)
    add(part.part.solids().sort_by_distance((0, 0, -59))[0])



with BuildPart() as body_2:
    # 草图29 → 凸台-拉伸7 (new body)
    with BuildSketch(Plane(origin=(0, 6, 0), x_dir=(1, 0, 0), z_dir=(0, 1, 0))):
        Polygon((56.568542495, 28.284271247), (28.284271247, 56.568542495), (42.426406871, 70.710678119), (70.710678119, 42.426406871), align=None)
    extrude(amount=-EXTRUDE_7_DEPTH)


with BuildPart() as body_3:
    # 草图29 → Extrude 7 2 (new body)
    with BuildSketch(Plane(origin=(0, 6, 0), x_dir=(1, 0, 0), z_dir=(0, 1, 0))):
        Polygon((-28.284271247, -56.568542495), (-56.568542495, -28.284271247), (-70.710678119, -42.426406871), (-42.426406871, -70.710678119), align=None)
    extrude(amount=-EXTRUDE_7_2_DEPTH)


with BuildPart() as cut_extrude_16_tool:
    # 草图30 → 切除-拉伸16 (new body)
    with BuildSketch(Plane(origin=(0, 6, 0), x_dir=(1, 0, 0), z_dir=(0, 1, 0))):
        with Locations(Location((63.993163697, 42.779960262, 0), (0, 0, 270))):
            Circle(SKETCH_30_R)
        with Locations(Location((42.779960262, 63.993163697, 0), (0, 0, 270))):
            Circle(SKETCH_30_R)
        with Locations(Location((35.001785669, 56.214989104, 0), (0, 0, 270))):
            Circle(SKETCH_30_R)
        with Locations(Location((56.214989104, 35.001785669, 0), (0, 0, 270))):
            Circle(SKETCH_30_R)
        with Locations(Location((-63.993163697, -42.779960262, 0), (0, 0, 270))):
            Circle(SKETCH_30_R)
        with Locations(Location((-56.214989104, -35.001785669, 0), (0, 0, 270))):
            Circle(SKETCH_30_R)
        with Locations(Location((-35.001785669, -56.214989104, 0), (0, 0, 270))):
            Circle(SKETCH_30_R)
        with Locations(Location((-42.779960262, -63.993163697, 0), (0, 0, 270))):
            Circle(SKETCH_30_R)
    extrude(amount=-CUT_EXTRUDE_16_DEPTH)


with BuildPart() as body_2_1:
    add(body_2.part)

    # 切除-拉伸16: cut by cut_extrude_16_tool
    add(cut_extrude_16_tool.part, mode=Mode.SUBTRACT)


with BuildPart() as body_3_1:
    add(body_3.part)

    # 切除-拉伸16: cut by cut_extrude_16_tool
    add(cut_extrude_16_tool.part, mode=Mode.SUBTRACT)


with BuildPart() as body_2_2:
    # Move Body 2: moved
    add(body_2_1.part.rotate(Axis((0, 0, 0), (0, -1, 0)), MOVE_BODY_2_ANGLE))


with BuildPart() as cut_extrude_15_kept_piece_1:
    add(cut_extrude_15_kept_piece.part)

    add(body_2_2.part)  # 凸台-拉伸9 merges body 2

    add(body_3_1.part)  # 凸台-拉伸9 merges body 3
    # 草图35 → 凸台-拉伸9 (add)
    with BuildSketch(Plane(origin=(0, 6, 0), x_dir=(1, 0, 0), z_dir=(0, 1, 0))):
        with BuildLine():
            Line((-56.568542495, -28.284271247), (-53.391339437, -25.10706819))
            ThreePointArc((-53.391339437, -25.10706819), (-41.71930009, -41.71930009), (-25.10706819, -53.391339437))
            Line((-25.10706819, -53.391339437), (-28.284271247, -56.568542495))
            Line((-28.284271247, -56.568542495), (-56.568542495, -28.284271247))
        make_face()
        with BuildLine():
            Line((28.284271247, -56.568542495), (56.568542495, -28.284271247))
            Line((56.568542495, -28.284271247), (53.391339437, -25.10706819))
            ThreePointArc((53.391339437, -25.10706819), (41.71930009, -41.71930009), (25.10706819, -53.391339437))
            Line((25.10706819, -53.391339437), (28.284271247, -56.568542495))
        make_face()
    extrude(amount=-EXTRUDE_9_DEPTH)

    # 圆角8
    fillet_8_edges = [cut_extrude_15_kept_piece_1.edges().sort_by_distance(p)[0] for p in [
        (-53.391339437, 3, 25.10706819),
        (-25.10706819, 3, 53.391339437),
        (25.10706819, 3, 53.391339437),
        (53.391339437, 3, 25.10706819),
    ]]
    fillet(fillet_8_edges, radius=FILLET_8_R)


solid = cut_extrude_15_kept_piece_1.part
